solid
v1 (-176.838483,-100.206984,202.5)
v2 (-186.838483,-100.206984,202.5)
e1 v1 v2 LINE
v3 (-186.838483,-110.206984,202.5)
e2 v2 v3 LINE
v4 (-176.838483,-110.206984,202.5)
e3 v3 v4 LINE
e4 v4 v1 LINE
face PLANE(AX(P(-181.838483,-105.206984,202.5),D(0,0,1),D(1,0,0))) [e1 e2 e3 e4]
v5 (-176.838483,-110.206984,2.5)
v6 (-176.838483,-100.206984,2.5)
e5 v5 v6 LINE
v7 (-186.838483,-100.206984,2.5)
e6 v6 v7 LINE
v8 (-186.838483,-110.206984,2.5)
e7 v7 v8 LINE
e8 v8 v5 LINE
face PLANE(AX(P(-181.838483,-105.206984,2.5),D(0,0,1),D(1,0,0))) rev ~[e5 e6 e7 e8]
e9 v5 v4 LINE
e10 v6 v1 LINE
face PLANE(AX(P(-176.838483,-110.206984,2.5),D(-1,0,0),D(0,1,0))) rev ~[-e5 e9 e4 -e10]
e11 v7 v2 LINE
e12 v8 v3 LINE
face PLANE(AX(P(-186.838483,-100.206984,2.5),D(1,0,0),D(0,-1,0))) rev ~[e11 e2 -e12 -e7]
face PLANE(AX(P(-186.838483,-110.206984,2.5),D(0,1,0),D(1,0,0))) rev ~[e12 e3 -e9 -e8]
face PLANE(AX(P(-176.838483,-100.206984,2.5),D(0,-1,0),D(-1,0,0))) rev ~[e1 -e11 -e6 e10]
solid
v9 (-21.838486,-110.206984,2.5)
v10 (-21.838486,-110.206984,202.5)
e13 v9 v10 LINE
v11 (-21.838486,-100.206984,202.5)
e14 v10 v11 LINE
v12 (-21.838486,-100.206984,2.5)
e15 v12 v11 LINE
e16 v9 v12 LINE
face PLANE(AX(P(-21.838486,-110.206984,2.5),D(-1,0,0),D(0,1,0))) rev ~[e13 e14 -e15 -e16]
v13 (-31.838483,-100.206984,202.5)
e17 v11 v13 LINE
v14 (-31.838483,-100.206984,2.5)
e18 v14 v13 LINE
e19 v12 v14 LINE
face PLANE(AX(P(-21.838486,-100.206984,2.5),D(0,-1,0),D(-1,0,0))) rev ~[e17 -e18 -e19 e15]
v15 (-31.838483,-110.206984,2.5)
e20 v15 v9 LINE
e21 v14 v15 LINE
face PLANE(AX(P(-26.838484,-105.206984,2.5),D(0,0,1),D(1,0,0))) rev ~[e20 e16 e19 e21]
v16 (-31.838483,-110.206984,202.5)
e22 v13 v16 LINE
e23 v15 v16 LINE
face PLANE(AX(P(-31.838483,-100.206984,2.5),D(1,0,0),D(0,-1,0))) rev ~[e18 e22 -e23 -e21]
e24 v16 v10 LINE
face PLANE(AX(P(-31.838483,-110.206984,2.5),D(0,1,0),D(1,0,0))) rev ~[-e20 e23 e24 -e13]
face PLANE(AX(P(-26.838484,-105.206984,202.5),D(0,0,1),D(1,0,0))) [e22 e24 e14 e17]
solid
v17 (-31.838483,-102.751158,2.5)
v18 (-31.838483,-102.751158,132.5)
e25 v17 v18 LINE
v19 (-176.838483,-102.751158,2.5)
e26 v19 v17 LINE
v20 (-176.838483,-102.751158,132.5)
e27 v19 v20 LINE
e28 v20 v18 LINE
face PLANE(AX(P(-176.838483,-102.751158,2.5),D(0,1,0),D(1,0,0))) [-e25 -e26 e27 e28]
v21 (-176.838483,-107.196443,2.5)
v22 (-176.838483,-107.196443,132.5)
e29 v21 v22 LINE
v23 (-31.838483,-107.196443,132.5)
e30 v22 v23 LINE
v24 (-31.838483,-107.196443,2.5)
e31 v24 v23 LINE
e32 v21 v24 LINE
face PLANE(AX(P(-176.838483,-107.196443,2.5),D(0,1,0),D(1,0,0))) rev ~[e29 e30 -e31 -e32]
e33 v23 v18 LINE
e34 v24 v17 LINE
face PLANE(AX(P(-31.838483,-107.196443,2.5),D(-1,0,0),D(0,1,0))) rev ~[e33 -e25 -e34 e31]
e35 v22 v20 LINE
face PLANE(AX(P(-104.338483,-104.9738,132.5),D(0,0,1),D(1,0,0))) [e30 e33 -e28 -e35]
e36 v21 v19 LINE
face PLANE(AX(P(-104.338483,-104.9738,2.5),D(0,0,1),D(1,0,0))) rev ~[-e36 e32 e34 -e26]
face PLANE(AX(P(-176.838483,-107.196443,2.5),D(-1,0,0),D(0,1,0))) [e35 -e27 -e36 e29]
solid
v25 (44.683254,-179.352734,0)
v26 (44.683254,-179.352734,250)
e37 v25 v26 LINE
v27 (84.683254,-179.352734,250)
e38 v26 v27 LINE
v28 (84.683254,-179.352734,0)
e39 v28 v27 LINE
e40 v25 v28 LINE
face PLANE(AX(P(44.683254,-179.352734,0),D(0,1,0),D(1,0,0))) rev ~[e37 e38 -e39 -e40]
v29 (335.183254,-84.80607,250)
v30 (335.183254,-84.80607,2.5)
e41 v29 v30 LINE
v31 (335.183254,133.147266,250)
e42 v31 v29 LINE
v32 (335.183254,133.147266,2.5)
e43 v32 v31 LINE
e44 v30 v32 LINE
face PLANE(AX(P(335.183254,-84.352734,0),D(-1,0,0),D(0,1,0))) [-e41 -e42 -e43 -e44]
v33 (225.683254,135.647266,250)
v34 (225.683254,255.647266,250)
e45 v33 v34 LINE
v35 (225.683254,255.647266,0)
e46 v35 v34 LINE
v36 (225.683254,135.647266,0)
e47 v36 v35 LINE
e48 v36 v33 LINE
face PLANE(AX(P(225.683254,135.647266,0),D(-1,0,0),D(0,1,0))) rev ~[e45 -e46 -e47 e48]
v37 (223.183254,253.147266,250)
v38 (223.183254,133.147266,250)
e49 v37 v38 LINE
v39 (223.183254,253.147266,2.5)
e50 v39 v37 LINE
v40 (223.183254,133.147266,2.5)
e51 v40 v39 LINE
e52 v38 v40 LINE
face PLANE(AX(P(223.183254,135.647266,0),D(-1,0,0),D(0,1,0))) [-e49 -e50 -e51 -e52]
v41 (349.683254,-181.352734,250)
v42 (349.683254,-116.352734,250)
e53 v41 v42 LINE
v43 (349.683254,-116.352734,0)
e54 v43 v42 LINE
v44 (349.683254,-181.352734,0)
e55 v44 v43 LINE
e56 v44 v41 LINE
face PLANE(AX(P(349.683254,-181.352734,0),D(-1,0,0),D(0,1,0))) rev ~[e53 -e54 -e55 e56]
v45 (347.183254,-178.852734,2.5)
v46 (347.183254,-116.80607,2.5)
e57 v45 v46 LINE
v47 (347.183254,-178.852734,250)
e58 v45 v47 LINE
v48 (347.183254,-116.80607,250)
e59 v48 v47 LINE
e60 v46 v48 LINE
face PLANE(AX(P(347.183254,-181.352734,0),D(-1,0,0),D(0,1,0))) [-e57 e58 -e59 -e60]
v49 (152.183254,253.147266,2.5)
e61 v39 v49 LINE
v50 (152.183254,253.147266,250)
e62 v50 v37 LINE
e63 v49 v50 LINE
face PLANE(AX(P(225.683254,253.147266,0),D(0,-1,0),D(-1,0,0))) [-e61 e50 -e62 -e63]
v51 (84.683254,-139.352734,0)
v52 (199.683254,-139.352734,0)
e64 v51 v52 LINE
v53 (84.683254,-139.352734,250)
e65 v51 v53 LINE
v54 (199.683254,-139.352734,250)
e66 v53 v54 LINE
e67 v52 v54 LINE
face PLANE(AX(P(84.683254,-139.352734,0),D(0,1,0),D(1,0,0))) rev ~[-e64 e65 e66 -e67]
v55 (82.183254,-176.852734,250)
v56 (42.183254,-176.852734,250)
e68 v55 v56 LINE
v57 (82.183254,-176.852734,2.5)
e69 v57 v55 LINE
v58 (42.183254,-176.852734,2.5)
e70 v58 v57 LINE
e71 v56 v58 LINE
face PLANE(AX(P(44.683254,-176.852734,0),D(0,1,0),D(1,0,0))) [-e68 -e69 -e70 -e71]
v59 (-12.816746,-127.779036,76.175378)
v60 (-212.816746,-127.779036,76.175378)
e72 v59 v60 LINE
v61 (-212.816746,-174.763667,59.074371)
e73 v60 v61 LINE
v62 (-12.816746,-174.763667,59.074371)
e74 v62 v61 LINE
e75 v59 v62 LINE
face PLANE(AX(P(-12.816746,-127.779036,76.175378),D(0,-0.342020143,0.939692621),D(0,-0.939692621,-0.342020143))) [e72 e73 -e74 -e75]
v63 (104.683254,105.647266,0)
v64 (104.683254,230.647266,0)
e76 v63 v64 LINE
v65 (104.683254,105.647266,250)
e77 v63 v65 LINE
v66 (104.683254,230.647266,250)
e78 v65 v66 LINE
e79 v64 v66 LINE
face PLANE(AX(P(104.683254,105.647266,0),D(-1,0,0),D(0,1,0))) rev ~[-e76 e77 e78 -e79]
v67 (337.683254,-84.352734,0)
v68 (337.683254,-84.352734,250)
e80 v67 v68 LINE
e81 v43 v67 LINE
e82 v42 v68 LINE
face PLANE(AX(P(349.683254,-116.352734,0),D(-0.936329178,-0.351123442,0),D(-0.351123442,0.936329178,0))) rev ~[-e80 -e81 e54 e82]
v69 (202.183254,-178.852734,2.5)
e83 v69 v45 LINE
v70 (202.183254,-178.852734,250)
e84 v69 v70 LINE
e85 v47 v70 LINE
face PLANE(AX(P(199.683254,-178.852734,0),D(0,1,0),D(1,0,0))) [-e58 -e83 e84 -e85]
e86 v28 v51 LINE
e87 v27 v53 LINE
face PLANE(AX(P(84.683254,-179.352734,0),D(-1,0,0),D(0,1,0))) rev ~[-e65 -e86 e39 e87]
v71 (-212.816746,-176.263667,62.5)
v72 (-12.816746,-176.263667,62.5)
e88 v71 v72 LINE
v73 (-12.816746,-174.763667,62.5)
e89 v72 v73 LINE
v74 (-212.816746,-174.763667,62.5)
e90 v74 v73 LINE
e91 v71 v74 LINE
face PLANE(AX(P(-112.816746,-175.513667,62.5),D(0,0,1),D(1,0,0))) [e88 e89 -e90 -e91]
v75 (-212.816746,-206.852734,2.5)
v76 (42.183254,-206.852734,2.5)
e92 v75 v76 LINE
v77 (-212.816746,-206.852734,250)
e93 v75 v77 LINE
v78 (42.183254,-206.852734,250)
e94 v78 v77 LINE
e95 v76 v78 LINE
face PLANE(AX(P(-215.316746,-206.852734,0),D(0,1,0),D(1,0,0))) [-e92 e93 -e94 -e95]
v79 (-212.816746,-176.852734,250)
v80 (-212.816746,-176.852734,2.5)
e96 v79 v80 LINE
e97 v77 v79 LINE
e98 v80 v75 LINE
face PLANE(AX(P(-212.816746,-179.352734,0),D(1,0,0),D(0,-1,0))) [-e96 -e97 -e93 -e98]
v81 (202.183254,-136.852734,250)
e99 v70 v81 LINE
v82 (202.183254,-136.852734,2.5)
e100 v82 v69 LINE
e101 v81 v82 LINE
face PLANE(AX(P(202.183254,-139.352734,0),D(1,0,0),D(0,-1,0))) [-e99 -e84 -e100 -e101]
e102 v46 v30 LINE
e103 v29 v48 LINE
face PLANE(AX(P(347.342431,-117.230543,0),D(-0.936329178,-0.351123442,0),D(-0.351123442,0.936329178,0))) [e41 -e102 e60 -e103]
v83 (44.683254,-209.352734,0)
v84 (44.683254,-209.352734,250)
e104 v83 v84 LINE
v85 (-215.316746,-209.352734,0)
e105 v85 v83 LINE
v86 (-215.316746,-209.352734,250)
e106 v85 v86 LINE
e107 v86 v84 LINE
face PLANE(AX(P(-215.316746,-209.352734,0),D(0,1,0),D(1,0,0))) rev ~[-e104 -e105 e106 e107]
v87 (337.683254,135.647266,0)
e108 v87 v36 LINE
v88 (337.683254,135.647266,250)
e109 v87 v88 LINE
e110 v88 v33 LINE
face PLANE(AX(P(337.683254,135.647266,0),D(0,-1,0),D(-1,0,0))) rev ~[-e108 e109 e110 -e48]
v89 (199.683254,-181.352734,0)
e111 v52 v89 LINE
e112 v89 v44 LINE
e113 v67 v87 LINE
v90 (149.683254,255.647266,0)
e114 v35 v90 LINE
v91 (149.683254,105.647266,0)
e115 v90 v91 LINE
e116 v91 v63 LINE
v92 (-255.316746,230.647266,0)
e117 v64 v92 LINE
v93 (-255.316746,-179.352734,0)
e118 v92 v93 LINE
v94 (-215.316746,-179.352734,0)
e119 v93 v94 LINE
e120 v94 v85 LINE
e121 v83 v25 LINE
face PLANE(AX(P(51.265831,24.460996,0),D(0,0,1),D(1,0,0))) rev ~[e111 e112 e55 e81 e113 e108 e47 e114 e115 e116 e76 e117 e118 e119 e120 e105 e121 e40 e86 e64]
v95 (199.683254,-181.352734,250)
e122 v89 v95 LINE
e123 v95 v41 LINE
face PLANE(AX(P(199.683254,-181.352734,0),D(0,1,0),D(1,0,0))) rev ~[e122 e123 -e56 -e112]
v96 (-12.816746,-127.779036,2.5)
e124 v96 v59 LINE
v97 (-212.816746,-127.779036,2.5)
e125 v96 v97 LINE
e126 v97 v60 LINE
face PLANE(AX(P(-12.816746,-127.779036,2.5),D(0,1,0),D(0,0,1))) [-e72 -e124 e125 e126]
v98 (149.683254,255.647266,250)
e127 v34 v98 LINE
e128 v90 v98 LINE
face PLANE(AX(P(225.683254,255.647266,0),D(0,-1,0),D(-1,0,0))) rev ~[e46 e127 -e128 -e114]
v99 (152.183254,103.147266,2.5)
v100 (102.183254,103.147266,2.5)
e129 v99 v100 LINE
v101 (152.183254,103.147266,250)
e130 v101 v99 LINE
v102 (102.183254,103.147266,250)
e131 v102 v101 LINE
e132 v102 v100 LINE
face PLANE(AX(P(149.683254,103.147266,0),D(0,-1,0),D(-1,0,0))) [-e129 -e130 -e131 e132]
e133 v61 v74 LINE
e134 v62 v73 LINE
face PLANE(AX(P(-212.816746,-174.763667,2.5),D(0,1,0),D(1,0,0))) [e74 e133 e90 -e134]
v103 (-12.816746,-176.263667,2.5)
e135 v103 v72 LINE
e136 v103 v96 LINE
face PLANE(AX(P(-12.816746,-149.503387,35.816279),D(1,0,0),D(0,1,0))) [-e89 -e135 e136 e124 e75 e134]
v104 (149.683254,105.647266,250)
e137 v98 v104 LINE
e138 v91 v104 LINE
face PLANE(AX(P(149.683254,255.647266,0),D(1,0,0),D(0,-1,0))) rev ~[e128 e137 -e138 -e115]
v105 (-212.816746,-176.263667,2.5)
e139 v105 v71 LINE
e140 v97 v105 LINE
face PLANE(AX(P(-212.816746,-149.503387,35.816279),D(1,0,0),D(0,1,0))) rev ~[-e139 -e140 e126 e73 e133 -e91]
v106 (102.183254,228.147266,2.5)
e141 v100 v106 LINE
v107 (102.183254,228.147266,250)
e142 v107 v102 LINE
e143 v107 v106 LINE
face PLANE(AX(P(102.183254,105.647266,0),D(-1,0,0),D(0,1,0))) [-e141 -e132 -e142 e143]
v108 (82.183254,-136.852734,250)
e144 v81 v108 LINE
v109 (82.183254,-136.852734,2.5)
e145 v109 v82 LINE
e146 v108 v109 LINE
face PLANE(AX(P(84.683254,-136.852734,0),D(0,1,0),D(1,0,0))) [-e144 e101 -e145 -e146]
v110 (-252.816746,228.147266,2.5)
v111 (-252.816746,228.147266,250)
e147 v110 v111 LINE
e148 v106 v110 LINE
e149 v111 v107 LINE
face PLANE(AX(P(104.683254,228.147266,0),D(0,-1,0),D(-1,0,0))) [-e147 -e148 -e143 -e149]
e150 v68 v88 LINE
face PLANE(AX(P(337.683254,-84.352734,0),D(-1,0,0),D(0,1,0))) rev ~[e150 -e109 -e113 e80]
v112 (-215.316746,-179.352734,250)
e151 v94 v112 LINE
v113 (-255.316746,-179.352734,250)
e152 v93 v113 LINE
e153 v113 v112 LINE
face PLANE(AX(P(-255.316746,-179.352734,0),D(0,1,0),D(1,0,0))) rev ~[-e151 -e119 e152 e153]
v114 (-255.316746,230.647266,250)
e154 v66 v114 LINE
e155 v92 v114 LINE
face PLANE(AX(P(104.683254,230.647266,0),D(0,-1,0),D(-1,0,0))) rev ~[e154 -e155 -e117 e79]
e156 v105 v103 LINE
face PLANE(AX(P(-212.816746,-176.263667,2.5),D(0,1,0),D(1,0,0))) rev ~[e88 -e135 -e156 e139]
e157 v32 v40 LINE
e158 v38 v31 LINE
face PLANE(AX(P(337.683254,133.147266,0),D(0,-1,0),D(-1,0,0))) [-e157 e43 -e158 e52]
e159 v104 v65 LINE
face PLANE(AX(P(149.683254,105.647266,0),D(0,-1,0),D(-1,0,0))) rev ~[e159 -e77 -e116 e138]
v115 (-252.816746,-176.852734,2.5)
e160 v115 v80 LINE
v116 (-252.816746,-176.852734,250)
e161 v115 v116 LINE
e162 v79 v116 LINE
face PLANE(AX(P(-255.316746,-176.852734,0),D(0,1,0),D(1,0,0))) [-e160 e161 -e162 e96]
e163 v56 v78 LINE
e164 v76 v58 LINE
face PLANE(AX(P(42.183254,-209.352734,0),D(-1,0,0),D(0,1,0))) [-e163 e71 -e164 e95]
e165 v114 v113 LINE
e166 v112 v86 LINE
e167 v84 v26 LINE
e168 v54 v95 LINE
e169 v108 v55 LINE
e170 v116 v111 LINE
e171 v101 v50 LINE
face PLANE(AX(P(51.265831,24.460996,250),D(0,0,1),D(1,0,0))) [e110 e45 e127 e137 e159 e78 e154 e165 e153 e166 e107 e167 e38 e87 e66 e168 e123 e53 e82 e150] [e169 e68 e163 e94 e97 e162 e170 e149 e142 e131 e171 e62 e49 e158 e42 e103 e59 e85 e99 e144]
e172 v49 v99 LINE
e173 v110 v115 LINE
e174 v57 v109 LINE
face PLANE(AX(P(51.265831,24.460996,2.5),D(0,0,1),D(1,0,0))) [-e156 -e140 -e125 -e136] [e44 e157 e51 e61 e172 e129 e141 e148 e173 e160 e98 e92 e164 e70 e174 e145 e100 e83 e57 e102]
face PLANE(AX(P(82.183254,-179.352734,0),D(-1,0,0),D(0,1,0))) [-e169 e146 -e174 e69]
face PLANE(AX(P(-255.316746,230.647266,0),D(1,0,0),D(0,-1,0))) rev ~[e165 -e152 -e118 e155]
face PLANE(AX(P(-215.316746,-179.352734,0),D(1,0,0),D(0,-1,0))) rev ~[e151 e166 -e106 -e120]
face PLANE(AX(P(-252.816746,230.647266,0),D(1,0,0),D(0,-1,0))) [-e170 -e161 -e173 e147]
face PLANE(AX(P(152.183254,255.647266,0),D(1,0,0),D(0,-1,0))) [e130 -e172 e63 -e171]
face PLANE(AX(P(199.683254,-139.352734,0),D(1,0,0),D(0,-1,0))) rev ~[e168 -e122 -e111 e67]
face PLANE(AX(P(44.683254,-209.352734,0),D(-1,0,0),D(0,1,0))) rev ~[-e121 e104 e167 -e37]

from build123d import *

# Parameters (mm, degrees)
F1_DEPTH = 250
F2_T     = -2.5
F3_W     = 200
F3_H     = 1.5
F4_DEPTH = 60
F6_DEPTH = 200
F8_DEPTH = 200
F7_W     = 145
F7_H     = 4.445284605
F9_DEPTH = 130


with BuildPart() as f1:
    # F0 (on Top) → F1 (new body)
    with BuildSketch(Plane.XY):
        Polygon((104.6832542723, 230.6472660226), (-255.3167457277, 230.6472660226), (-255.3167457277, -179.3527339774), (-215.3167457277, -179.3527339774), (-215.3167457277, -209.3527339774), (44.6832542723, -209.3527339774), (44.6832542723, -179.3527339774), (84.6832542723, -179.3527339774), (84.6832542723, -139.3527339774), (199.6832542723, -139.3527339774), (199.6832542723, -181.3527339774), (349.6832542723, -181.3527339774), (349.6832542723, -116.3527339774), (337.6832542723, -84.3527339774), (337.6832542723, 135.6472660226), (225.6832542723, 135.6472660226), (225.6832542723, 255.6472660226), (149.6832542723, 255.6472660226), (149.6832542723, 105.6472660226), (104.6832542723, 105.6472660226), align=None)
    extrude(amount=F1_DEPTH)

    # F2
    f2_openings = [f1.faces().sort_by_distance(p)[0] for p in [
        (24.63536, 12.151901, 250),
    ]]
    offset(amount=F2_T, openings=f2_openings, kind=Kind.INTERSECTION)

    # F3 (on face) → F4 (join)
    with BuildSketch(Plane.XY.offset(2.5)):
        with Locations((-112.8167457277, -175.5136670351)):
            Rectangle(F3_W, F3_H)
    extrude(amount=F4_DEPTH)

    # F5 (on face) → F6 (join)
    with BuildSketch(Plane.YZ.offset(-12.8167457277)):
        Polygon((-127.7790359959, 76.1753777748), (-174.7636670351, 59.0743706086), (-174.7636670351, 2.5), (-127.7790359959, 2.5), align=None)
    extrude(amount=-F6_DEPTH)


with BuildPart() as f8:
    # F7 (on face) → F8 (new body)
    with BuildSketch(Plane.XY.offset(2.5)):
        Polygon((-176.8384825487, -100.2069843521), (-186.8384825487, -100.2069843521), (-186.8384825487, -110.2069843521), (-176.8384825487, -110.2069843521), (-176.8384825487, -107.1964427829), (-176.8384825487, -102.7511581779), align=None)
    extrude(amount=F8_DEPTH)


with BuildPart() as f8b:
    # F7 (on face) → F8, piece 2 (new body)
    with BuildSketch(Plane.XY.offset(2.5)):
        Polygon((-31.8384825487, -100.2069843521), (-31.8384825487, -102.7511581779), (-31.8384825487, -107.1964427829), (-31.8384825487, -110.2069843521), (-21.8384855244, -110.2069843521), (-21.8384855244, -100.2069843521), align=None)
    extrude(amount=F8_DEPTH)


with BuildPart() as f9:
    # F7 (on face) → F9 (new body)
    with BuildSketch(Plane.XY.offset(2.5)):
        with Locations((-104.3384825487, -104.9738004804)):
            Rectangle(F7_W, F7_H)
    extrude(amount=F9_DEPTH)


solid = Compound([f1.part, f8.part, f8b.part, f9.part])
